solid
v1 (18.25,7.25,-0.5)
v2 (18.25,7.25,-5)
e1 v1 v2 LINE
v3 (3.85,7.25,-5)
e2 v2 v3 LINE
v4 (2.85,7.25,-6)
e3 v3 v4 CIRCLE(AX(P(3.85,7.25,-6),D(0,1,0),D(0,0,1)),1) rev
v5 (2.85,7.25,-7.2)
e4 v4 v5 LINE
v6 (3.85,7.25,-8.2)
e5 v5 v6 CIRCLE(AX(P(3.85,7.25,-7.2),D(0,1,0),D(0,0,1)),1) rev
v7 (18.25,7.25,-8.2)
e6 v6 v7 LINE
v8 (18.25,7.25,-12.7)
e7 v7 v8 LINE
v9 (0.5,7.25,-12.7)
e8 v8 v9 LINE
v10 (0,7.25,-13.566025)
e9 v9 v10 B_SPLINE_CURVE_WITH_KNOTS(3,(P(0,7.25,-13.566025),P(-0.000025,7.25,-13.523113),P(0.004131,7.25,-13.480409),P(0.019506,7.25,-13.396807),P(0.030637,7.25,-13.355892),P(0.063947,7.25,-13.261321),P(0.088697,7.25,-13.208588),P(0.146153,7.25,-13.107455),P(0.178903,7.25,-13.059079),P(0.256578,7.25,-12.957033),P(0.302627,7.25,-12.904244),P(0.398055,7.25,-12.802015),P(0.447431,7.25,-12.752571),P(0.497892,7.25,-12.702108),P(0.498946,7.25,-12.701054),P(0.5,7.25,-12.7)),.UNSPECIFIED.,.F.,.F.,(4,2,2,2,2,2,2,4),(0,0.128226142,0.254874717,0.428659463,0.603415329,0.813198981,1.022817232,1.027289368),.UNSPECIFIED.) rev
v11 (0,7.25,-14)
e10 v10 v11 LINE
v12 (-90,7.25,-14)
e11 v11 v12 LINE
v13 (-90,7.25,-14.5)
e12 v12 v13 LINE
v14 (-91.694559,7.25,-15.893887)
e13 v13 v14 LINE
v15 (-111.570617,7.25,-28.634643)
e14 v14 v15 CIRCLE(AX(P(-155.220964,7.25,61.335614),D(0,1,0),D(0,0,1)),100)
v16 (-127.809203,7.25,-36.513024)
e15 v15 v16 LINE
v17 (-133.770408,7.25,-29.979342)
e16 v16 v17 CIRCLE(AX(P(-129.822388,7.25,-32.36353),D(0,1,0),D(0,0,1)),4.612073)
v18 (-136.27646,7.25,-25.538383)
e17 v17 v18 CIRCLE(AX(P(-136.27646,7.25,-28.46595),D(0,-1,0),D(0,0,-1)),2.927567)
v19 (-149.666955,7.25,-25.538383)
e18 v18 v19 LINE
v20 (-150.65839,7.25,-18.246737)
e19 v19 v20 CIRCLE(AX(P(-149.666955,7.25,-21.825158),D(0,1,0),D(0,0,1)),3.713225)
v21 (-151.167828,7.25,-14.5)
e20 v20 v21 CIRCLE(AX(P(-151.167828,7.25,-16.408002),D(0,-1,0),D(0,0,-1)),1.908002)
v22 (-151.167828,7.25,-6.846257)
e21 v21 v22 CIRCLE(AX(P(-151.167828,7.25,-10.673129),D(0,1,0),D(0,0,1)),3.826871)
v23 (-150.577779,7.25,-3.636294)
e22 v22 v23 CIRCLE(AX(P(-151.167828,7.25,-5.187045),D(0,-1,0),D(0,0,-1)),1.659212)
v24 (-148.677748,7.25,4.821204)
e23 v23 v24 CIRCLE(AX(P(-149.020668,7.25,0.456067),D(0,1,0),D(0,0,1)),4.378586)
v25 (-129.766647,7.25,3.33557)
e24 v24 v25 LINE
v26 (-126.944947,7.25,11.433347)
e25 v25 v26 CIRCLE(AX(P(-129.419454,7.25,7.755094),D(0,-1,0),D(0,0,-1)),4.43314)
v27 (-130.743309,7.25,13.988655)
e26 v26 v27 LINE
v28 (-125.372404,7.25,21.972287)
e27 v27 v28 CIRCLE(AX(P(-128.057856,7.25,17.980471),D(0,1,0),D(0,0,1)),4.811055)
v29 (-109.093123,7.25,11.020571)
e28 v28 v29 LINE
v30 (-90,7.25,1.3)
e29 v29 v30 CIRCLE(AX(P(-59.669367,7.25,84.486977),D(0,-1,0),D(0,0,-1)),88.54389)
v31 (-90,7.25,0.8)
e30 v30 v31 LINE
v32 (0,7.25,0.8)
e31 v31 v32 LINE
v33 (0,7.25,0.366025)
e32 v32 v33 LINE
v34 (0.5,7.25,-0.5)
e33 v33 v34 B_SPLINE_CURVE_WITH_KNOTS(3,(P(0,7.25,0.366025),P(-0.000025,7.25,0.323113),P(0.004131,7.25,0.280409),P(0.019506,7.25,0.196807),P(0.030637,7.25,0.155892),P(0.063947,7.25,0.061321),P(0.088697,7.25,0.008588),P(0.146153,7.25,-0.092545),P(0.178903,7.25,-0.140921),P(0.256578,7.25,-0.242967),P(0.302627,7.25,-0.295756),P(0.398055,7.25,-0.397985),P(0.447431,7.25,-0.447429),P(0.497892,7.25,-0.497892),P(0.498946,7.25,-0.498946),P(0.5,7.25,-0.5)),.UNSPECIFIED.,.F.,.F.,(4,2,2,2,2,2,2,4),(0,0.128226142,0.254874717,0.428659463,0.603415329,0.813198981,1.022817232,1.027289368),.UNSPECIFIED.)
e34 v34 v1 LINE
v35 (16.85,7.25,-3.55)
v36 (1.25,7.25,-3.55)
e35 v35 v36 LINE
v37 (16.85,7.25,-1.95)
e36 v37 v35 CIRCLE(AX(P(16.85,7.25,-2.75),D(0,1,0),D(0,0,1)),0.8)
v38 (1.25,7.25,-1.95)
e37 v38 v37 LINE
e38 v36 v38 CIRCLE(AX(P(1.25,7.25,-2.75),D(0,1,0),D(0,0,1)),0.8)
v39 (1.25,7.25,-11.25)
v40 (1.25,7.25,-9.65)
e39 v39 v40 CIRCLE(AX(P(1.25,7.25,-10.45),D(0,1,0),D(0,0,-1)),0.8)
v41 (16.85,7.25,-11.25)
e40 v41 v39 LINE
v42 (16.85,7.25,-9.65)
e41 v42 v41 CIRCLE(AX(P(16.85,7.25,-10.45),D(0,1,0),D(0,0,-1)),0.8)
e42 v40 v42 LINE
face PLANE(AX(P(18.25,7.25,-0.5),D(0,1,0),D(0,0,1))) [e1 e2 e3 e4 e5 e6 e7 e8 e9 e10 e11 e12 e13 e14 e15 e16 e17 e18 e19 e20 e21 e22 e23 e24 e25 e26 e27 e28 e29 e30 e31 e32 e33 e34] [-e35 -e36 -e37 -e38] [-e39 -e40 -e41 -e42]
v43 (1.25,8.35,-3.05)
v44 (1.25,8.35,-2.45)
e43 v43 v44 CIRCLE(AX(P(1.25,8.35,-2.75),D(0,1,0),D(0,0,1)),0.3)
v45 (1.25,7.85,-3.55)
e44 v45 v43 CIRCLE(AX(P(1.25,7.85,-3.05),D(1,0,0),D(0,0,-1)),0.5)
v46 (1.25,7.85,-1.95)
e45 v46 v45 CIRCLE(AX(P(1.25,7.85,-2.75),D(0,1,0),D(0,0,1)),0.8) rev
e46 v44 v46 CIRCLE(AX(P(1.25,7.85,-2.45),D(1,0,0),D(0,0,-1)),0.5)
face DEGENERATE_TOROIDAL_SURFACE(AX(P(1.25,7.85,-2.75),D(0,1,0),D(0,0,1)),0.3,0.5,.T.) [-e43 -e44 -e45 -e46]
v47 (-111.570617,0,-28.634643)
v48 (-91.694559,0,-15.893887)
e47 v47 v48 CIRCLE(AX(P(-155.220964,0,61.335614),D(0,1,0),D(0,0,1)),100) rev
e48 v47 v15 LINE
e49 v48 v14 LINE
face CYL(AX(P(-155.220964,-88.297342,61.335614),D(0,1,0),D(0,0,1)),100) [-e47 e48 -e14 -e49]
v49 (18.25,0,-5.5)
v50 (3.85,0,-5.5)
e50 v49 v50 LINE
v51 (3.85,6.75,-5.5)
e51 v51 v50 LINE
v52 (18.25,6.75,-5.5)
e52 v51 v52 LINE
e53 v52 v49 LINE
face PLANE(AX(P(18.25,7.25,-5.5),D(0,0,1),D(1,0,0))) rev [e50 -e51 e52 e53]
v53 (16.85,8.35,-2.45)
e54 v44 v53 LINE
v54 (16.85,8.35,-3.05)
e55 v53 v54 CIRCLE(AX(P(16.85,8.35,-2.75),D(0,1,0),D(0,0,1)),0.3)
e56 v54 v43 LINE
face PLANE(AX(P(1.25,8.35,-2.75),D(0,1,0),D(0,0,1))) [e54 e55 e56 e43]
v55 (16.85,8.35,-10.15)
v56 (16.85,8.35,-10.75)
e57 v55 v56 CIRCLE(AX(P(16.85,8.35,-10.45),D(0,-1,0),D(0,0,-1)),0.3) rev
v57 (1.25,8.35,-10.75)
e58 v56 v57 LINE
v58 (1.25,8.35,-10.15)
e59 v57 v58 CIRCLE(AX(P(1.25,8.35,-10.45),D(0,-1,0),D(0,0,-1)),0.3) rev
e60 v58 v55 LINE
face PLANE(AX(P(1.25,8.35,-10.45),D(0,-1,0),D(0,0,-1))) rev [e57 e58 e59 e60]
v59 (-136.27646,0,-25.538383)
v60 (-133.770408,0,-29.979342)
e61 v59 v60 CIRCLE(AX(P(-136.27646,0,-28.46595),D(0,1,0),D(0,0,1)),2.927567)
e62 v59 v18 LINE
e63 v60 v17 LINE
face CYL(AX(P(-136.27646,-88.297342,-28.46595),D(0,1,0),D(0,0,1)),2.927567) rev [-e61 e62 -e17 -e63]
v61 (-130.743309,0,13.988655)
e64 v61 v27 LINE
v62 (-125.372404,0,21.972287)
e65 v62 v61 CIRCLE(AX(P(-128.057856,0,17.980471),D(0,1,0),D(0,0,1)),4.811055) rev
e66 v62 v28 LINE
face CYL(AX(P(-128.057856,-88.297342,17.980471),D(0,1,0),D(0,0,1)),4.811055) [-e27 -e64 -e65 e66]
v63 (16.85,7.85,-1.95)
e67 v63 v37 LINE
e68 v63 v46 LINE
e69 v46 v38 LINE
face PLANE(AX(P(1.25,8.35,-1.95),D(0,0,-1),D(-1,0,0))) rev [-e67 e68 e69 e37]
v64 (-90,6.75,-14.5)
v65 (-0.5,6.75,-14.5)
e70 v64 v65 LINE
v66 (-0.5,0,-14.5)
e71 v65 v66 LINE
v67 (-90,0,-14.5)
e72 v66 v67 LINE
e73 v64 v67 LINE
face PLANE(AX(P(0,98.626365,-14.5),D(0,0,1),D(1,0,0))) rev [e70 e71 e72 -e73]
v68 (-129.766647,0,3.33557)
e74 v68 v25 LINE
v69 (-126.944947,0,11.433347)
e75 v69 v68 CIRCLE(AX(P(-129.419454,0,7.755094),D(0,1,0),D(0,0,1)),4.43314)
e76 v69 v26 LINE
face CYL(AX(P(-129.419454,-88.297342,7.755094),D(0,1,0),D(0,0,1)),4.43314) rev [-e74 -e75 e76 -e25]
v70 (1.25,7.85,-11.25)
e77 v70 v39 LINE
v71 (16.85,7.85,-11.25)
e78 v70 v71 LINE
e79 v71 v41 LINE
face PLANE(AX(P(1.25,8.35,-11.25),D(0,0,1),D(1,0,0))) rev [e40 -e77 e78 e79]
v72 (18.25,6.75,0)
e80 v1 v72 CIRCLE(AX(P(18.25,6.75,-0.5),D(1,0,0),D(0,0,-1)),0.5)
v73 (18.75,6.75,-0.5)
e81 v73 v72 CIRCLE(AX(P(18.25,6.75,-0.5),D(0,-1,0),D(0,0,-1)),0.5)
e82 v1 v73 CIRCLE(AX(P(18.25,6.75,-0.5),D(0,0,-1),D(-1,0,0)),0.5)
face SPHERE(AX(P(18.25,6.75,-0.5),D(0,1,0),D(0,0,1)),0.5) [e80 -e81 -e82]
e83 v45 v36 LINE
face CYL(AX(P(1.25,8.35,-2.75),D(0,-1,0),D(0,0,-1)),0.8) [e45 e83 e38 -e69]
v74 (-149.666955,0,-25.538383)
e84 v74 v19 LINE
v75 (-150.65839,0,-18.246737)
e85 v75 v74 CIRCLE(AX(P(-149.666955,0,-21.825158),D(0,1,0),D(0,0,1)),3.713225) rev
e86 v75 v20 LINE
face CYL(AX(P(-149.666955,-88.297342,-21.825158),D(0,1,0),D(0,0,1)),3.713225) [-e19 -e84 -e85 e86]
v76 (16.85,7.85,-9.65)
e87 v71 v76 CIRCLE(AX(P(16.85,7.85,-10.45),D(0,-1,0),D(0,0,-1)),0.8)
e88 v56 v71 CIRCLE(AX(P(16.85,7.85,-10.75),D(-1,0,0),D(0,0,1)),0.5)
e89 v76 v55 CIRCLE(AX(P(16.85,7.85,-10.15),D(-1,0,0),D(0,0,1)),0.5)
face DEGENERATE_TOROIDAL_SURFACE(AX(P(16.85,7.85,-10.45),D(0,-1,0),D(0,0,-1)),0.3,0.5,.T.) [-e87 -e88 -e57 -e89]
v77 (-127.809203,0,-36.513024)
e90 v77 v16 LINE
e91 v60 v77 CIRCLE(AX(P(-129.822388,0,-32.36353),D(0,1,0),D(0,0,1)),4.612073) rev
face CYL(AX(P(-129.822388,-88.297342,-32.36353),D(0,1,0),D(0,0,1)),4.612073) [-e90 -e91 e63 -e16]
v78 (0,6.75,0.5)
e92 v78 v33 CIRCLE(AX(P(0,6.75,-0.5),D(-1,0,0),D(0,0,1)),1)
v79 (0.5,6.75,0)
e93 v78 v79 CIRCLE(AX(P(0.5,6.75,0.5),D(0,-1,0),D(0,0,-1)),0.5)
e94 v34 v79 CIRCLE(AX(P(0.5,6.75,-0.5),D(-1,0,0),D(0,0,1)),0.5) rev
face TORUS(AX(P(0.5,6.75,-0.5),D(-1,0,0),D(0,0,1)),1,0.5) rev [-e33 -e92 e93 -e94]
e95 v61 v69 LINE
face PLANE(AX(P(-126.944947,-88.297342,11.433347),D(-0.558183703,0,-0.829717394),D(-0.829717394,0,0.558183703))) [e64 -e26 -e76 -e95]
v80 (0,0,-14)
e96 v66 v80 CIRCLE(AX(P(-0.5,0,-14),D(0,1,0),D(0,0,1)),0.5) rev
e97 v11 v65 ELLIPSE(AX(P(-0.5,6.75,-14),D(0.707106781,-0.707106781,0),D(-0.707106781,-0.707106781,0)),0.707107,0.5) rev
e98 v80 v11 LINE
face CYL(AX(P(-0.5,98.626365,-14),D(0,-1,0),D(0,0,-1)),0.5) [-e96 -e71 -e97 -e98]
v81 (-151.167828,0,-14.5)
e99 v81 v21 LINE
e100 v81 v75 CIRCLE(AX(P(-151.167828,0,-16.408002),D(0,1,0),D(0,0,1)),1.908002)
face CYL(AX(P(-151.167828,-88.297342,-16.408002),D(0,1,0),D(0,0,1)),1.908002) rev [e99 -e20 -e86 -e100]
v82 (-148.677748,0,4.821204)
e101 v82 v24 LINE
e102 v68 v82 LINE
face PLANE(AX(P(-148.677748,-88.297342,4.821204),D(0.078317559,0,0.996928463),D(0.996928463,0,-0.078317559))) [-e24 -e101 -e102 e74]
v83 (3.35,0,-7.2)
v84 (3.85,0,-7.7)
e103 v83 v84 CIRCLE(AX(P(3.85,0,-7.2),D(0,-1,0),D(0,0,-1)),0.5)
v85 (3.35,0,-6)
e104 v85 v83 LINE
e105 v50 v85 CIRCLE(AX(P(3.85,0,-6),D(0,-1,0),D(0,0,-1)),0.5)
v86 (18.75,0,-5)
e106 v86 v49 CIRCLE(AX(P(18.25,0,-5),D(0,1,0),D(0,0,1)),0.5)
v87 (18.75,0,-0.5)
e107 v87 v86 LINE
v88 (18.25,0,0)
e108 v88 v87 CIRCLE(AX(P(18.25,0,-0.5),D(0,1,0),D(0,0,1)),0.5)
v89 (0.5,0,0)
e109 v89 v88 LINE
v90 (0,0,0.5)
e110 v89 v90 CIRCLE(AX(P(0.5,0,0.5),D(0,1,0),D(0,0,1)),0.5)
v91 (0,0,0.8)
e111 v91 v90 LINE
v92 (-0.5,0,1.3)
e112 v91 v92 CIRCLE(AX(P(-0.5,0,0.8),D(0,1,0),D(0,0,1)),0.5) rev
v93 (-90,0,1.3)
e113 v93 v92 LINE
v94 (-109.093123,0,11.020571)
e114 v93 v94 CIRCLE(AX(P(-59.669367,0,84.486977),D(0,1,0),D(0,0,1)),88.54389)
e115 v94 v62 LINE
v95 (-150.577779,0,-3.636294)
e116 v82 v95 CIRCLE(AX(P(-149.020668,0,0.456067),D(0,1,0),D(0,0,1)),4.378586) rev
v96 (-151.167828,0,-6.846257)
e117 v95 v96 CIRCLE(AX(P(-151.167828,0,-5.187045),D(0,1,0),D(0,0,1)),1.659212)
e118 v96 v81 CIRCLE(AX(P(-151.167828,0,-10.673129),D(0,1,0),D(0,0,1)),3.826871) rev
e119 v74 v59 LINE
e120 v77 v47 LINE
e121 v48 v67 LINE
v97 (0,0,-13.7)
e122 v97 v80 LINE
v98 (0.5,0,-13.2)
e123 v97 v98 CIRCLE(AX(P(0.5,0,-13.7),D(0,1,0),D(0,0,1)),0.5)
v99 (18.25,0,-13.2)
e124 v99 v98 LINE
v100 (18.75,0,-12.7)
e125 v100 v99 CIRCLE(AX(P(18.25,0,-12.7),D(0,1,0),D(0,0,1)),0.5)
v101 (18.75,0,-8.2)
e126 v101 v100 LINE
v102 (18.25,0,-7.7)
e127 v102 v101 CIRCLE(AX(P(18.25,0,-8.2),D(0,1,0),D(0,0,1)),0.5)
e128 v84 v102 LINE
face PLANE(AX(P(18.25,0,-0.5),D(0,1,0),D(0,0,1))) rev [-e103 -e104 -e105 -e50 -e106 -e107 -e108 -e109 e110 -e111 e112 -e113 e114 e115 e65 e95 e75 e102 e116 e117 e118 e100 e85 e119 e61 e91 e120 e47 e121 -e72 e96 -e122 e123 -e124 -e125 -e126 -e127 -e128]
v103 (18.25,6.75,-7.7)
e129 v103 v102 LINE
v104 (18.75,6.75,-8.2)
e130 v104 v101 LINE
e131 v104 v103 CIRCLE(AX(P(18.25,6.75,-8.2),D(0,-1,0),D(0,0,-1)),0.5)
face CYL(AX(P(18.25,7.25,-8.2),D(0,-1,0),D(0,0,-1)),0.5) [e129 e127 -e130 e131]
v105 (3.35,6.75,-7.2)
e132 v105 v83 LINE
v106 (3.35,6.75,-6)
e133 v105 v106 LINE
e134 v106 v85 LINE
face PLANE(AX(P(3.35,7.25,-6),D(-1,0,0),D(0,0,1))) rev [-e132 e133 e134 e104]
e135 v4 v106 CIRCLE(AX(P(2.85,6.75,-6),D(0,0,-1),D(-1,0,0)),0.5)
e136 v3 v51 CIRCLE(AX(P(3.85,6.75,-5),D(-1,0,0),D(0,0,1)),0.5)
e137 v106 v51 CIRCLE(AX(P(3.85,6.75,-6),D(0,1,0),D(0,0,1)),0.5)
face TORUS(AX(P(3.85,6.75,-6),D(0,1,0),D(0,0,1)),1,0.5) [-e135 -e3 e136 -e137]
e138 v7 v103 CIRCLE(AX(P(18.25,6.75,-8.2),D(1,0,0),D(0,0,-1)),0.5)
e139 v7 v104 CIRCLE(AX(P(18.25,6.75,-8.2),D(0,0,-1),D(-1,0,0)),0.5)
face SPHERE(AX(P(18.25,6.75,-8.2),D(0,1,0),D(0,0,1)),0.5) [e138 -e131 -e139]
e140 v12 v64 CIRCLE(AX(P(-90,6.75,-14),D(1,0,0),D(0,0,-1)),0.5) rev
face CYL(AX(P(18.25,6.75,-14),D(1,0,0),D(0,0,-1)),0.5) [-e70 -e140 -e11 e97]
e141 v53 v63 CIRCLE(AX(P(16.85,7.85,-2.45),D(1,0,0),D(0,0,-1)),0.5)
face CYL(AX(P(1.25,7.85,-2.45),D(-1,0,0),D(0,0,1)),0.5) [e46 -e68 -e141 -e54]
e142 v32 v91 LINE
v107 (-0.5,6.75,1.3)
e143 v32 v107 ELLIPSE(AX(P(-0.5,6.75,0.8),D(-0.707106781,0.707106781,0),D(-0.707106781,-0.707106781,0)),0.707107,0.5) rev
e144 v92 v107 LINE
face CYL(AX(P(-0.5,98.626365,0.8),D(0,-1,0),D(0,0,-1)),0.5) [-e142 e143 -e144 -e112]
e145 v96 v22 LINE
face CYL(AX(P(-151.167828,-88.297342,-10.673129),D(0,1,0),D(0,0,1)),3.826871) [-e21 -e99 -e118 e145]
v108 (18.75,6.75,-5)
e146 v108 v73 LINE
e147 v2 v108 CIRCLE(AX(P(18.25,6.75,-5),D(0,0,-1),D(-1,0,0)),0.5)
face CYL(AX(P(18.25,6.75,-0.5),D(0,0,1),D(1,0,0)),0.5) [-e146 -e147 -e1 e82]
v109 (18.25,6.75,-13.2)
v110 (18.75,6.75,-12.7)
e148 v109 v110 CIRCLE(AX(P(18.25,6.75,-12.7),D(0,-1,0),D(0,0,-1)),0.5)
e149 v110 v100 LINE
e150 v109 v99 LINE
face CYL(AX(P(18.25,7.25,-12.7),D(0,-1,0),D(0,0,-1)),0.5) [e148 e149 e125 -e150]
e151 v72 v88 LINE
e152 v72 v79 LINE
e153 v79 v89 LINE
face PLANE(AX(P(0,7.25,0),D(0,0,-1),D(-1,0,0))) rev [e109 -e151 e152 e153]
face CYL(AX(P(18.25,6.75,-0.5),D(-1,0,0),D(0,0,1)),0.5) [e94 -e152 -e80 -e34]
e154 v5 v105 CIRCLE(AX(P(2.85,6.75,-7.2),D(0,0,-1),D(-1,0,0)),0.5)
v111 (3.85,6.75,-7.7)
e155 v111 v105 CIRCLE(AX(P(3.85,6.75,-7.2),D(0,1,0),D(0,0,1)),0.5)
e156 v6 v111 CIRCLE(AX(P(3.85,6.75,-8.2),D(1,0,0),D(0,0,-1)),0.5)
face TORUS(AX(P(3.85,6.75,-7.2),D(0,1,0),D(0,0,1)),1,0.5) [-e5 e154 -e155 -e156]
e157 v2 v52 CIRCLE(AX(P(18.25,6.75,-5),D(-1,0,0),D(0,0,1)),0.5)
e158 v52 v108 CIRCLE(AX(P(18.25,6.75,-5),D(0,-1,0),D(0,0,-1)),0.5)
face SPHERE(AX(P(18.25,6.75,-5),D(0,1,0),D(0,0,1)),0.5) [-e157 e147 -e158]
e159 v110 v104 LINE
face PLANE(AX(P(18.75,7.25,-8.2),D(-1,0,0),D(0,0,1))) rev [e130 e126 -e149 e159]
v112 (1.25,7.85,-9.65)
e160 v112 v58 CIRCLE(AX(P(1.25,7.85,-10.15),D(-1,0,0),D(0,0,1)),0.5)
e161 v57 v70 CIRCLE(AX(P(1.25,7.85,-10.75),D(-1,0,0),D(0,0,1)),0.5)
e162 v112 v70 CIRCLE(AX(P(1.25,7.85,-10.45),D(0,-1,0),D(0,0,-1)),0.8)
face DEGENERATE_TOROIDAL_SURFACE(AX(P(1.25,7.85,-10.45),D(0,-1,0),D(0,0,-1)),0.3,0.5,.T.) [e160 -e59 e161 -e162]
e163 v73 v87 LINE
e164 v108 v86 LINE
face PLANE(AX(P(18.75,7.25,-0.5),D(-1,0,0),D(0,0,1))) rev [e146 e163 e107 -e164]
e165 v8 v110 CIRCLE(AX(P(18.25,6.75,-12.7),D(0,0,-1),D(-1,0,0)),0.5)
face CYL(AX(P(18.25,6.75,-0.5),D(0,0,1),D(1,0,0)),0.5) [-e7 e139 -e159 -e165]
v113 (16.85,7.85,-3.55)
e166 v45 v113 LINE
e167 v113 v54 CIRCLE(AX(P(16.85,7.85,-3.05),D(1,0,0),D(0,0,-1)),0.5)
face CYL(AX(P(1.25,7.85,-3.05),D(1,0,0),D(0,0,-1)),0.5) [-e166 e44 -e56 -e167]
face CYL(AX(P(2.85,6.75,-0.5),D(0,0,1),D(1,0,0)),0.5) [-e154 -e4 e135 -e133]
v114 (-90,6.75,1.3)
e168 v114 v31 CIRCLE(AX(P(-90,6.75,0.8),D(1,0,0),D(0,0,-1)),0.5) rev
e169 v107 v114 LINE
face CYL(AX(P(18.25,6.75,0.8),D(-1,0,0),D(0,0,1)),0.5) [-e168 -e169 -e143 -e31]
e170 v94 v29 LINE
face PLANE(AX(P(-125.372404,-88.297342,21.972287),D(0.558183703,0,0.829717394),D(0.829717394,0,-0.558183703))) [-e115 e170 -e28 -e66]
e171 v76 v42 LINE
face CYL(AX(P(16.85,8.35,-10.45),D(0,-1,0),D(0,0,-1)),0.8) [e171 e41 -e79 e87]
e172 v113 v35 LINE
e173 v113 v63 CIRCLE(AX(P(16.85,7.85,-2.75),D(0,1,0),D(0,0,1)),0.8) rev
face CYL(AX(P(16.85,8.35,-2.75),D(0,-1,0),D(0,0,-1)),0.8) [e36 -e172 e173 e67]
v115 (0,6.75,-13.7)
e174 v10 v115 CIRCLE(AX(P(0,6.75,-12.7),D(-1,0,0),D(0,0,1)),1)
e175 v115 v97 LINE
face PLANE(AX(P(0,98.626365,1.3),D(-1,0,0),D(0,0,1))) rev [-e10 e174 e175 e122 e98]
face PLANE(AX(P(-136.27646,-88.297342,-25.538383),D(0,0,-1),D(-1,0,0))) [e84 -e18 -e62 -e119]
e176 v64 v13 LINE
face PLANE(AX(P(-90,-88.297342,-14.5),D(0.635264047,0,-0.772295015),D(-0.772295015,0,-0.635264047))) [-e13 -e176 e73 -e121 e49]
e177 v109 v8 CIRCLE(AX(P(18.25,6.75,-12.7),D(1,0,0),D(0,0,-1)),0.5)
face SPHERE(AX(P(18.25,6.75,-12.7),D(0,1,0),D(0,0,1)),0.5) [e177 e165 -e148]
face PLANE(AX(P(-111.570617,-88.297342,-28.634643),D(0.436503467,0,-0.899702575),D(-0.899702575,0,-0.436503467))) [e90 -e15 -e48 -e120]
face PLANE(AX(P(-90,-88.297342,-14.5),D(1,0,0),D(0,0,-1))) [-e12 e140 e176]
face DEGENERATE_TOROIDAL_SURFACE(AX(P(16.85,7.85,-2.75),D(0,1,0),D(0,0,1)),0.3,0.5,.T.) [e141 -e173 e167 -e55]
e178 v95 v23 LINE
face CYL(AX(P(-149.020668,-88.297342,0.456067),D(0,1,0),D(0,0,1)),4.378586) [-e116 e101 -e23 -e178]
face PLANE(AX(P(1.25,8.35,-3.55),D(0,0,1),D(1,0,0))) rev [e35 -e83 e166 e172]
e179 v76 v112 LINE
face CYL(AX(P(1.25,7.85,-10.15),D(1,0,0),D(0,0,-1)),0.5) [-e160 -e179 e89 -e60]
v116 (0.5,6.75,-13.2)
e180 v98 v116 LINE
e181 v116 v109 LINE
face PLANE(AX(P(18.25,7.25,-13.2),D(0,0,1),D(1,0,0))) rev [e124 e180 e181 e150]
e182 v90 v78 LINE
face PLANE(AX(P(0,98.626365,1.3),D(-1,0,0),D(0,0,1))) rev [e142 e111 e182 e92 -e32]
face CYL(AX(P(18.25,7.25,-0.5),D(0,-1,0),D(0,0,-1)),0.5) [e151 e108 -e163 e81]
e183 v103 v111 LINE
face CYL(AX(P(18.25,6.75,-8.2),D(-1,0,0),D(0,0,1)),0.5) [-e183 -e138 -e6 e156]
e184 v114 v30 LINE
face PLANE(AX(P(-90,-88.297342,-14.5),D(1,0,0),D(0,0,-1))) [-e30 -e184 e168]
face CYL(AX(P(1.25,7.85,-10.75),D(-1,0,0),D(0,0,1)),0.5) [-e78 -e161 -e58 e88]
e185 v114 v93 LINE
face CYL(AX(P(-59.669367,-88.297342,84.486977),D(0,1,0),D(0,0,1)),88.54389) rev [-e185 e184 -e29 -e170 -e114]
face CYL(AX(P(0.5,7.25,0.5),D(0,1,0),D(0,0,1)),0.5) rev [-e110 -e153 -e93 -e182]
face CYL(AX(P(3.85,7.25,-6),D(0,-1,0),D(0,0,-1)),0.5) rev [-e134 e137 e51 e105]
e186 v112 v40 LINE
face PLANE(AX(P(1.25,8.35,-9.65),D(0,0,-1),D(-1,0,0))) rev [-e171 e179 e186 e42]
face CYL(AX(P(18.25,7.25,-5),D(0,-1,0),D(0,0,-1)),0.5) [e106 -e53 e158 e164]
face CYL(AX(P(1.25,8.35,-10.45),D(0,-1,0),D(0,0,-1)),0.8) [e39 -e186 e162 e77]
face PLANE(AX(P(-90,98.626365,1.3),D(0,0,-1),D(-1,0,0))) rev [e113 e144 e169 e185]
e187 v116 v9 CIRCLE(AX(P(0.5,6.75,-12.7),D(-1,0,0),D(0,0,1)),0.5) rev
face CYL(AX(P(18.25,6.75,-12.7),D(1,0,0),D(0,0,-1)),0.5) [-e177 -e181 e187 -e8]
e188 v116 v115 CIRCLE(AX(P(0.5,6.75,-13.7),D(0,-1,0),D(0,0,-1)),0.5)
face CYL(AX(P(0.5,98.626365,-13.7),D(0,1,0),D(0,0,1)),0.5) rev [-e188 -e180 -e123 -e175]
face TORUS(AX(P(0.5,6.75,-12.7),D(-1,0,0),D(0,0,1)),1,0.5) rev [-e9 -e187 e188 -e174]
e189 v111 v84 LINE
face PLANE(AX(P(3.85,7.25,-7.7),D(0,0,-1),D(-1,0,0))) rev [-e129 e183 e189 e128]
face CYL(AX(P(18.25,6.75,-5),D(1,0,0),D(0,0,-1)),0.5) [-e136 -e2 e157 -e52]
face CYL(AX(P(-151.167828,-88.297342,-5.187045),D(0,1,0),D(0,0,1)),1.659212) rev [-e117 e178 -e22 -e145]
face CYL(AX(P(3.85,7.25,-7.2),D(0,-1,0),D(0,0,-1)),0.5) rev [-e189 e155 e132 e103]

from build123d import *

# Parameters (mm, degrees)
BOSS_EXTRUDE1_DEPTH = 7.25
BOSS_EXTRUDE2_DEPTH = 1.1
FILLET1_R           = 0.5
SKETCH4_W           = 90
SKETCH4_H           = 15.8
BOSS_EXTRUDE3_DEPTH = 7.25
FILLET3_R           = 0.5
BOSS_EXTRUDE4_DEPTH = 7.25


with BuildPart() as part:
    # Sketch1 → Boss-Extrude1 (new body)
    with BuildSketch(Plane(origin=(0, 0, 0), x_dir=(1, 0, 0), z_dir=(0, 1, 0))):
        with BuildLine():
            Line((0, 0), (18.25, 0))
            ThreePointArc((18.25, 0), (18.603553391, 0.146446609), (18.75, 0.5))
            Line((18.75, 0.5), (18.75, 5))
            ThreePointArc((18.75, 5), (18.603553391, 5.353553391), (18.25, 5.5))
            Line((18.25, 5.5), (3.85, 5.5))
            ThreePointArc((3.85, 5.5), (3.496446609, 5.646446609), (3.35, 6))
            Line((3.35, 6), (3.35, 7.2))
            ThreePointArc((3.35, 7.2), (3.496446609, 7.553553391), (3.85, 7.7))
            Line((3.85, 7.7), (18.25, 7.7))
            ThreePointArc((18.25, 7.7), (18.603553391, 7.846446609), (18.75, 8.2))
            Line((18.75, 8.2), (18.75, 12.7))
            ThreePointArc((18.75, 12.7), (18.603553391, 13.053553391), (18.25, 13.2))
            Line((18.25, 13.2), (0, 13.2))
            Line((0, 13.2), (0, 0))
        make_face()
    extrude(amount=BOSS_EXTRUDE1_DEPTH)

    # Sketch2 → Boss-Extrude2 (add)
    with BuildSketch(Plane(origin=(0, 7.25, 0), x_dir=(1, 0, 0), z_dir=(0, 1, 0))):
        with BuildLine():
            Line((1.25, 3.55), (16.85, 3.55))
            ThreePointArc((16.85, 3.55), (17.65, 2.75), (16.85, 1.95))
            Line((16.85, 1.95), (1.25, 1.95))
            ThreePointArc((1.25, 1.95), (0.45, 2.75), (1.25, 3.55))
        make_face()
        with BuildLine():
            Line((1.25, 9.65), (16.85, 9.65))
            ThreePointArc((16.85, 9.65), (17.65, 10.45), (16.85, 11.25))
            Line((16.85, 11.25), (1.25, 11.25))
            ThreePointArc((1.25, 11.25), (0.45, 10.45), (1.25, 9.65))
        make_face()
    extrude(amount=BOSS_EXTRUDE2_DEPTH)

    # Fillet1
    fillet1_edges = [part.edges().sort_by_distance(p)[0] for p in [
        (18.603553391, 7.25, -0.146446609),
        (18.75, 7.25, -2.75),
        (18.603553391, 7.25, -5.353553391),
        (11.05, 7.25, -5.5),
        (3.496446609, 7.25, -5.646446609),
        (3.35, 7.25, -6.6),
        (3.496446609, 7.25, -7.553553391),
        (11.05, 7.25, -7.7),
        (18.603553391, 7.25, -7.846446609),
        (0.45, 8.35, -2.75),
        (9.05, 8.35, -1.95),
        (17.65, 8.35, -2.75),
        (9.05, 8.35, -3.55),
        (18.75, 7.25, -10.45),
        (18.603553391, 7.25, -13.053553391),
        (9.125, 7.25, -13.2),
        (0.45, 8.35, -10.45),
        (9.05, 8.35, -9.65),
        (17.65, 8.35, -10.45),
        (9.05, 8.35, -11.25),
        (9.125, 7.25, 0),
    ]]
    fillet(fillet1_edges, radius=FILLET1_R)

    # Sketch4 → Boss-Extrude3 (add)
    with BuildSketch(Plane(origin=(0, 0, 0), x_dir=(1, 0, 0), z_dir=(0, 1, 0))):
        with Locations((-45, 6.6)):
            Rectangle(SKETCH4_W, SKETCH4_H)
    extrude(amount=BOSS_EXTRUDE3_DEPTH)

    # Fillet3
    # the kernel refuses this fillet: 0.5 mm, written as the material it adds along each edge
    with BuildSketch(Plane(origin=(0, 0, 0), x_dir=(0, 0, 1), z_dir=(0, 1, 0))) as fillet3_piece_1:
        with BuildLine():
            CenterArc((FILLET3_R, FILLET3_R), FILLET3_R, 180, 90)
            Line((0, FILLET3_R), (0, 0))
            Line((0, 0), (FILLET3_R, 0))
        make_face()
    extrude(amount=6.75)
    with BuildSketch(Plane(origin=(0, 0, -13.2), x_dir=(0, 0, -1), z_dir=(0, 1, 0))) as fillet3_piece_2:
        with BuildLine():
            CenterArc((FILLET3_R, -FILLET3_R), FILLET3_R, 90, 90)
            Line((0, -FILLET3_R), (0, 0))
            Line((0, 0), (FILLET3_R, 0))
        make_face()
    extrude(amount=6.75)
    with BuildSketch(Plane(origin=(0, 6.75, -12.7), x_dir=(0, -0.8017442392976486, 0.5976672776328271), z_dir=(0, -0.5976672776328271, -0.8017442392976486))) as fillet3_piece_3_section:
        with BuildLine():
            CenterArc((0.5 + FILLET3_R, -FILLET3_R), FILLET3_R, 90, 90)
            Line((0.5, -FILLET3_R), (0.5, 0))
            Line((0.5, 0), (0.5 + FILLET3_R, 0))
        make_face()
    fillet3_piece_3 = revolve(axis=Axis((0, 6.75, -12.7), (-1, 0, 0)), revolution_arc=233.296989237, mode=Mode.PRIVATE)
    fillet3_piece_3 = split(fillet3_piece_3, bisect_by=Plane(origin=(0.15581414, 7.25, -13.074969472), z_dir=(0, -1, 0)), keep=Keep.TOP, mode=Mode.PRIVATE)
    add(fillet3_piece_3)
    with BuildSketch(Plane(origin=(0, 6.75, -0.5), x_dir=(0, -0.801744239297648, -0.5976672776328278), z_dir=(0, -0.5976672776328278, 0.801744239297648))) as fillet3_piece_4_section:
        with BuildLine():
            CenterArc((0.5 + FILLET3_R, FILLET3_R), FILLET3_R, 180, 90)
            Line((0.5, FILLET3_R), (0.5, 0))
            Line((0.5, 0), (0.5 + FILLET3_R, 0))
        make_face()
    fillet3_piece_4 = revolve(axis=Axis((0, 6.75, -0.5), (1, 0, 0)), revolution_arc=233.296989237, mode=Mode.PRIVATE)
    fillet3_piece_4 = split(fillet3_piece_4, bisect_by=Plane(origin=(0.155814151, 7.25, -0.125030527), z_dir=(0, -1, 0)), keep=Keep.TOP, mode=Mode.PRIVATE)
    add(fillet3_piece_4)
    # the kernel refuses this fillet: 0.5 mm, written as the material it takes off along each edge
    with BuildSketch(Plane(origin=(0, -1.25, 1.3), x_dir=(0, 0, -1), z_dir=(0, 1, 0))) as fillet3_2_piece_1:
        with BuildLine():
            CenterArc((FILLET3_R, FILLET3_R), FILLET3_R, 180, 90)
            Line((0, FILLET3_R), (0, 0))
            Line((0, 0), (FILLET3_R, 0))
        make_face()
    extrude(amount=9.75, mode=Mode.SUBTRACT)
    with BuildSketch(Plane(origin=(0, -1.25, -14.5), x_dir=(0, 0, 1), z_dir=(0, 1, 0))) as fillet3_2_piece_2:
        with BuildLine():
            CenterArc((FILLET3_R, -FILLET3_R), FILLET3_R, 90, 90)
            Line((0, -FILLET3_R), (0, 0))
            Line((0, 0), (FILLET3_R, 0))
        make_face()
    extrude(amount=9.75, mode=Mode.SUBTRACT)
    with BuildSketch(Plane(origin=(-91.25, 7.25, 1.3), x_dir=(0, 0, -1), z_dir=(1, 0, 0)), Plane(origin=(1.25, 7.25, -14.5), x_dir=(0, 0, 1), z_dir=(-1, 0, 0))) as fillet3_2_piece_3:
        with BuildLine():
            CenterArc((FILLET3_R, -FILLET3_R), FILLET3_R, 90, 90)
            Line((0, -FILLET3_R), (0, 0))
            Line((0, 0), (FILLET3_R, 0))
        make_face()
    extrude(amount=92.5, mode=Mode.SUBTRACT)

    # Sketch5 → Boss-Extrude4 (add)
    with BuildSketch(Plane(origin=(0, 7.25, 0), x_dir=(1, 0, 0), z_dir=(0, 1, 0))):
        with BuildLine():
            Line((-90, 14.5), (-91.694558873, 15.893887447))
            ThreePointArc((-91.694558873, 15.893887447), (-101.255273326, 22.85289034), (-111.570616913, 28.634643431))
            Line((-111.570616913, 28.634643431), (-127.809202797, 36.513023717))
            ThreePointArc((-127.809202797, 36.513023717), (-133.229461338, 35.472077659), (-133.770408027, 29.979341726))
            ThreePointArc((-133.770408027, 29.979341726), (-133.726831866, 27.027184623), (-136.276459546, 25.538383383))
            Line((-136.276459546, 25.538383383), (-149.666955308, 25.538383383))
            ThreePointArc((-149.666955308, 25.538383383), (-153.346325023, 22.325436822), (-150.658389652, 18.246737208))
            ThreePointArc((-150.658389652, 18.246737208), (-149.277221775, 16.150939464), (-151.167827967, 14.5))
            ThreePointArc((-151.167827967, 14.5), (-154.994699417, 10.67312855), (-151.167827967, 6.8462571))
            ThreePointArc((-151.167827967, 6.8462571), (-149.535956381, 5.487012057), (-150.577779387, 3.636294146))
            ThreePointArc((-150.577779387, 3.636294146), (-153.292773274, -1.415823247), (-148.677747615, -4.821204301))
            Line((-148.677747615, -4.821204301), (-129.766646687, -3.335569849))
            ThreePointArc((-129.766646687, -3.335569849), (-125.233182835, -6.296372519), (-126.944947273, -11.433347257))
            Line((-126.944947273, -11.433347257), (-130.743308987, -13.988655394))
            ThreePointArc((-130.743308987, -13.988655394), (-132.049672504, -20.665923892), (-125.372404006, -21.97228741))
            Line((-125.372404006, -21.97228741), (-109.093123035, -11.020571314))
            ThreePointArc((-109.093123035, -11.020571314), (-99.841658682, -5.580656509), (-90, -1.3))
            Line((-90, -1.3), (-90, 14.5))
        make_face()
    extrude(amount=-BOSS_EXTRUDE4_DEPTH)


solid = part.part
